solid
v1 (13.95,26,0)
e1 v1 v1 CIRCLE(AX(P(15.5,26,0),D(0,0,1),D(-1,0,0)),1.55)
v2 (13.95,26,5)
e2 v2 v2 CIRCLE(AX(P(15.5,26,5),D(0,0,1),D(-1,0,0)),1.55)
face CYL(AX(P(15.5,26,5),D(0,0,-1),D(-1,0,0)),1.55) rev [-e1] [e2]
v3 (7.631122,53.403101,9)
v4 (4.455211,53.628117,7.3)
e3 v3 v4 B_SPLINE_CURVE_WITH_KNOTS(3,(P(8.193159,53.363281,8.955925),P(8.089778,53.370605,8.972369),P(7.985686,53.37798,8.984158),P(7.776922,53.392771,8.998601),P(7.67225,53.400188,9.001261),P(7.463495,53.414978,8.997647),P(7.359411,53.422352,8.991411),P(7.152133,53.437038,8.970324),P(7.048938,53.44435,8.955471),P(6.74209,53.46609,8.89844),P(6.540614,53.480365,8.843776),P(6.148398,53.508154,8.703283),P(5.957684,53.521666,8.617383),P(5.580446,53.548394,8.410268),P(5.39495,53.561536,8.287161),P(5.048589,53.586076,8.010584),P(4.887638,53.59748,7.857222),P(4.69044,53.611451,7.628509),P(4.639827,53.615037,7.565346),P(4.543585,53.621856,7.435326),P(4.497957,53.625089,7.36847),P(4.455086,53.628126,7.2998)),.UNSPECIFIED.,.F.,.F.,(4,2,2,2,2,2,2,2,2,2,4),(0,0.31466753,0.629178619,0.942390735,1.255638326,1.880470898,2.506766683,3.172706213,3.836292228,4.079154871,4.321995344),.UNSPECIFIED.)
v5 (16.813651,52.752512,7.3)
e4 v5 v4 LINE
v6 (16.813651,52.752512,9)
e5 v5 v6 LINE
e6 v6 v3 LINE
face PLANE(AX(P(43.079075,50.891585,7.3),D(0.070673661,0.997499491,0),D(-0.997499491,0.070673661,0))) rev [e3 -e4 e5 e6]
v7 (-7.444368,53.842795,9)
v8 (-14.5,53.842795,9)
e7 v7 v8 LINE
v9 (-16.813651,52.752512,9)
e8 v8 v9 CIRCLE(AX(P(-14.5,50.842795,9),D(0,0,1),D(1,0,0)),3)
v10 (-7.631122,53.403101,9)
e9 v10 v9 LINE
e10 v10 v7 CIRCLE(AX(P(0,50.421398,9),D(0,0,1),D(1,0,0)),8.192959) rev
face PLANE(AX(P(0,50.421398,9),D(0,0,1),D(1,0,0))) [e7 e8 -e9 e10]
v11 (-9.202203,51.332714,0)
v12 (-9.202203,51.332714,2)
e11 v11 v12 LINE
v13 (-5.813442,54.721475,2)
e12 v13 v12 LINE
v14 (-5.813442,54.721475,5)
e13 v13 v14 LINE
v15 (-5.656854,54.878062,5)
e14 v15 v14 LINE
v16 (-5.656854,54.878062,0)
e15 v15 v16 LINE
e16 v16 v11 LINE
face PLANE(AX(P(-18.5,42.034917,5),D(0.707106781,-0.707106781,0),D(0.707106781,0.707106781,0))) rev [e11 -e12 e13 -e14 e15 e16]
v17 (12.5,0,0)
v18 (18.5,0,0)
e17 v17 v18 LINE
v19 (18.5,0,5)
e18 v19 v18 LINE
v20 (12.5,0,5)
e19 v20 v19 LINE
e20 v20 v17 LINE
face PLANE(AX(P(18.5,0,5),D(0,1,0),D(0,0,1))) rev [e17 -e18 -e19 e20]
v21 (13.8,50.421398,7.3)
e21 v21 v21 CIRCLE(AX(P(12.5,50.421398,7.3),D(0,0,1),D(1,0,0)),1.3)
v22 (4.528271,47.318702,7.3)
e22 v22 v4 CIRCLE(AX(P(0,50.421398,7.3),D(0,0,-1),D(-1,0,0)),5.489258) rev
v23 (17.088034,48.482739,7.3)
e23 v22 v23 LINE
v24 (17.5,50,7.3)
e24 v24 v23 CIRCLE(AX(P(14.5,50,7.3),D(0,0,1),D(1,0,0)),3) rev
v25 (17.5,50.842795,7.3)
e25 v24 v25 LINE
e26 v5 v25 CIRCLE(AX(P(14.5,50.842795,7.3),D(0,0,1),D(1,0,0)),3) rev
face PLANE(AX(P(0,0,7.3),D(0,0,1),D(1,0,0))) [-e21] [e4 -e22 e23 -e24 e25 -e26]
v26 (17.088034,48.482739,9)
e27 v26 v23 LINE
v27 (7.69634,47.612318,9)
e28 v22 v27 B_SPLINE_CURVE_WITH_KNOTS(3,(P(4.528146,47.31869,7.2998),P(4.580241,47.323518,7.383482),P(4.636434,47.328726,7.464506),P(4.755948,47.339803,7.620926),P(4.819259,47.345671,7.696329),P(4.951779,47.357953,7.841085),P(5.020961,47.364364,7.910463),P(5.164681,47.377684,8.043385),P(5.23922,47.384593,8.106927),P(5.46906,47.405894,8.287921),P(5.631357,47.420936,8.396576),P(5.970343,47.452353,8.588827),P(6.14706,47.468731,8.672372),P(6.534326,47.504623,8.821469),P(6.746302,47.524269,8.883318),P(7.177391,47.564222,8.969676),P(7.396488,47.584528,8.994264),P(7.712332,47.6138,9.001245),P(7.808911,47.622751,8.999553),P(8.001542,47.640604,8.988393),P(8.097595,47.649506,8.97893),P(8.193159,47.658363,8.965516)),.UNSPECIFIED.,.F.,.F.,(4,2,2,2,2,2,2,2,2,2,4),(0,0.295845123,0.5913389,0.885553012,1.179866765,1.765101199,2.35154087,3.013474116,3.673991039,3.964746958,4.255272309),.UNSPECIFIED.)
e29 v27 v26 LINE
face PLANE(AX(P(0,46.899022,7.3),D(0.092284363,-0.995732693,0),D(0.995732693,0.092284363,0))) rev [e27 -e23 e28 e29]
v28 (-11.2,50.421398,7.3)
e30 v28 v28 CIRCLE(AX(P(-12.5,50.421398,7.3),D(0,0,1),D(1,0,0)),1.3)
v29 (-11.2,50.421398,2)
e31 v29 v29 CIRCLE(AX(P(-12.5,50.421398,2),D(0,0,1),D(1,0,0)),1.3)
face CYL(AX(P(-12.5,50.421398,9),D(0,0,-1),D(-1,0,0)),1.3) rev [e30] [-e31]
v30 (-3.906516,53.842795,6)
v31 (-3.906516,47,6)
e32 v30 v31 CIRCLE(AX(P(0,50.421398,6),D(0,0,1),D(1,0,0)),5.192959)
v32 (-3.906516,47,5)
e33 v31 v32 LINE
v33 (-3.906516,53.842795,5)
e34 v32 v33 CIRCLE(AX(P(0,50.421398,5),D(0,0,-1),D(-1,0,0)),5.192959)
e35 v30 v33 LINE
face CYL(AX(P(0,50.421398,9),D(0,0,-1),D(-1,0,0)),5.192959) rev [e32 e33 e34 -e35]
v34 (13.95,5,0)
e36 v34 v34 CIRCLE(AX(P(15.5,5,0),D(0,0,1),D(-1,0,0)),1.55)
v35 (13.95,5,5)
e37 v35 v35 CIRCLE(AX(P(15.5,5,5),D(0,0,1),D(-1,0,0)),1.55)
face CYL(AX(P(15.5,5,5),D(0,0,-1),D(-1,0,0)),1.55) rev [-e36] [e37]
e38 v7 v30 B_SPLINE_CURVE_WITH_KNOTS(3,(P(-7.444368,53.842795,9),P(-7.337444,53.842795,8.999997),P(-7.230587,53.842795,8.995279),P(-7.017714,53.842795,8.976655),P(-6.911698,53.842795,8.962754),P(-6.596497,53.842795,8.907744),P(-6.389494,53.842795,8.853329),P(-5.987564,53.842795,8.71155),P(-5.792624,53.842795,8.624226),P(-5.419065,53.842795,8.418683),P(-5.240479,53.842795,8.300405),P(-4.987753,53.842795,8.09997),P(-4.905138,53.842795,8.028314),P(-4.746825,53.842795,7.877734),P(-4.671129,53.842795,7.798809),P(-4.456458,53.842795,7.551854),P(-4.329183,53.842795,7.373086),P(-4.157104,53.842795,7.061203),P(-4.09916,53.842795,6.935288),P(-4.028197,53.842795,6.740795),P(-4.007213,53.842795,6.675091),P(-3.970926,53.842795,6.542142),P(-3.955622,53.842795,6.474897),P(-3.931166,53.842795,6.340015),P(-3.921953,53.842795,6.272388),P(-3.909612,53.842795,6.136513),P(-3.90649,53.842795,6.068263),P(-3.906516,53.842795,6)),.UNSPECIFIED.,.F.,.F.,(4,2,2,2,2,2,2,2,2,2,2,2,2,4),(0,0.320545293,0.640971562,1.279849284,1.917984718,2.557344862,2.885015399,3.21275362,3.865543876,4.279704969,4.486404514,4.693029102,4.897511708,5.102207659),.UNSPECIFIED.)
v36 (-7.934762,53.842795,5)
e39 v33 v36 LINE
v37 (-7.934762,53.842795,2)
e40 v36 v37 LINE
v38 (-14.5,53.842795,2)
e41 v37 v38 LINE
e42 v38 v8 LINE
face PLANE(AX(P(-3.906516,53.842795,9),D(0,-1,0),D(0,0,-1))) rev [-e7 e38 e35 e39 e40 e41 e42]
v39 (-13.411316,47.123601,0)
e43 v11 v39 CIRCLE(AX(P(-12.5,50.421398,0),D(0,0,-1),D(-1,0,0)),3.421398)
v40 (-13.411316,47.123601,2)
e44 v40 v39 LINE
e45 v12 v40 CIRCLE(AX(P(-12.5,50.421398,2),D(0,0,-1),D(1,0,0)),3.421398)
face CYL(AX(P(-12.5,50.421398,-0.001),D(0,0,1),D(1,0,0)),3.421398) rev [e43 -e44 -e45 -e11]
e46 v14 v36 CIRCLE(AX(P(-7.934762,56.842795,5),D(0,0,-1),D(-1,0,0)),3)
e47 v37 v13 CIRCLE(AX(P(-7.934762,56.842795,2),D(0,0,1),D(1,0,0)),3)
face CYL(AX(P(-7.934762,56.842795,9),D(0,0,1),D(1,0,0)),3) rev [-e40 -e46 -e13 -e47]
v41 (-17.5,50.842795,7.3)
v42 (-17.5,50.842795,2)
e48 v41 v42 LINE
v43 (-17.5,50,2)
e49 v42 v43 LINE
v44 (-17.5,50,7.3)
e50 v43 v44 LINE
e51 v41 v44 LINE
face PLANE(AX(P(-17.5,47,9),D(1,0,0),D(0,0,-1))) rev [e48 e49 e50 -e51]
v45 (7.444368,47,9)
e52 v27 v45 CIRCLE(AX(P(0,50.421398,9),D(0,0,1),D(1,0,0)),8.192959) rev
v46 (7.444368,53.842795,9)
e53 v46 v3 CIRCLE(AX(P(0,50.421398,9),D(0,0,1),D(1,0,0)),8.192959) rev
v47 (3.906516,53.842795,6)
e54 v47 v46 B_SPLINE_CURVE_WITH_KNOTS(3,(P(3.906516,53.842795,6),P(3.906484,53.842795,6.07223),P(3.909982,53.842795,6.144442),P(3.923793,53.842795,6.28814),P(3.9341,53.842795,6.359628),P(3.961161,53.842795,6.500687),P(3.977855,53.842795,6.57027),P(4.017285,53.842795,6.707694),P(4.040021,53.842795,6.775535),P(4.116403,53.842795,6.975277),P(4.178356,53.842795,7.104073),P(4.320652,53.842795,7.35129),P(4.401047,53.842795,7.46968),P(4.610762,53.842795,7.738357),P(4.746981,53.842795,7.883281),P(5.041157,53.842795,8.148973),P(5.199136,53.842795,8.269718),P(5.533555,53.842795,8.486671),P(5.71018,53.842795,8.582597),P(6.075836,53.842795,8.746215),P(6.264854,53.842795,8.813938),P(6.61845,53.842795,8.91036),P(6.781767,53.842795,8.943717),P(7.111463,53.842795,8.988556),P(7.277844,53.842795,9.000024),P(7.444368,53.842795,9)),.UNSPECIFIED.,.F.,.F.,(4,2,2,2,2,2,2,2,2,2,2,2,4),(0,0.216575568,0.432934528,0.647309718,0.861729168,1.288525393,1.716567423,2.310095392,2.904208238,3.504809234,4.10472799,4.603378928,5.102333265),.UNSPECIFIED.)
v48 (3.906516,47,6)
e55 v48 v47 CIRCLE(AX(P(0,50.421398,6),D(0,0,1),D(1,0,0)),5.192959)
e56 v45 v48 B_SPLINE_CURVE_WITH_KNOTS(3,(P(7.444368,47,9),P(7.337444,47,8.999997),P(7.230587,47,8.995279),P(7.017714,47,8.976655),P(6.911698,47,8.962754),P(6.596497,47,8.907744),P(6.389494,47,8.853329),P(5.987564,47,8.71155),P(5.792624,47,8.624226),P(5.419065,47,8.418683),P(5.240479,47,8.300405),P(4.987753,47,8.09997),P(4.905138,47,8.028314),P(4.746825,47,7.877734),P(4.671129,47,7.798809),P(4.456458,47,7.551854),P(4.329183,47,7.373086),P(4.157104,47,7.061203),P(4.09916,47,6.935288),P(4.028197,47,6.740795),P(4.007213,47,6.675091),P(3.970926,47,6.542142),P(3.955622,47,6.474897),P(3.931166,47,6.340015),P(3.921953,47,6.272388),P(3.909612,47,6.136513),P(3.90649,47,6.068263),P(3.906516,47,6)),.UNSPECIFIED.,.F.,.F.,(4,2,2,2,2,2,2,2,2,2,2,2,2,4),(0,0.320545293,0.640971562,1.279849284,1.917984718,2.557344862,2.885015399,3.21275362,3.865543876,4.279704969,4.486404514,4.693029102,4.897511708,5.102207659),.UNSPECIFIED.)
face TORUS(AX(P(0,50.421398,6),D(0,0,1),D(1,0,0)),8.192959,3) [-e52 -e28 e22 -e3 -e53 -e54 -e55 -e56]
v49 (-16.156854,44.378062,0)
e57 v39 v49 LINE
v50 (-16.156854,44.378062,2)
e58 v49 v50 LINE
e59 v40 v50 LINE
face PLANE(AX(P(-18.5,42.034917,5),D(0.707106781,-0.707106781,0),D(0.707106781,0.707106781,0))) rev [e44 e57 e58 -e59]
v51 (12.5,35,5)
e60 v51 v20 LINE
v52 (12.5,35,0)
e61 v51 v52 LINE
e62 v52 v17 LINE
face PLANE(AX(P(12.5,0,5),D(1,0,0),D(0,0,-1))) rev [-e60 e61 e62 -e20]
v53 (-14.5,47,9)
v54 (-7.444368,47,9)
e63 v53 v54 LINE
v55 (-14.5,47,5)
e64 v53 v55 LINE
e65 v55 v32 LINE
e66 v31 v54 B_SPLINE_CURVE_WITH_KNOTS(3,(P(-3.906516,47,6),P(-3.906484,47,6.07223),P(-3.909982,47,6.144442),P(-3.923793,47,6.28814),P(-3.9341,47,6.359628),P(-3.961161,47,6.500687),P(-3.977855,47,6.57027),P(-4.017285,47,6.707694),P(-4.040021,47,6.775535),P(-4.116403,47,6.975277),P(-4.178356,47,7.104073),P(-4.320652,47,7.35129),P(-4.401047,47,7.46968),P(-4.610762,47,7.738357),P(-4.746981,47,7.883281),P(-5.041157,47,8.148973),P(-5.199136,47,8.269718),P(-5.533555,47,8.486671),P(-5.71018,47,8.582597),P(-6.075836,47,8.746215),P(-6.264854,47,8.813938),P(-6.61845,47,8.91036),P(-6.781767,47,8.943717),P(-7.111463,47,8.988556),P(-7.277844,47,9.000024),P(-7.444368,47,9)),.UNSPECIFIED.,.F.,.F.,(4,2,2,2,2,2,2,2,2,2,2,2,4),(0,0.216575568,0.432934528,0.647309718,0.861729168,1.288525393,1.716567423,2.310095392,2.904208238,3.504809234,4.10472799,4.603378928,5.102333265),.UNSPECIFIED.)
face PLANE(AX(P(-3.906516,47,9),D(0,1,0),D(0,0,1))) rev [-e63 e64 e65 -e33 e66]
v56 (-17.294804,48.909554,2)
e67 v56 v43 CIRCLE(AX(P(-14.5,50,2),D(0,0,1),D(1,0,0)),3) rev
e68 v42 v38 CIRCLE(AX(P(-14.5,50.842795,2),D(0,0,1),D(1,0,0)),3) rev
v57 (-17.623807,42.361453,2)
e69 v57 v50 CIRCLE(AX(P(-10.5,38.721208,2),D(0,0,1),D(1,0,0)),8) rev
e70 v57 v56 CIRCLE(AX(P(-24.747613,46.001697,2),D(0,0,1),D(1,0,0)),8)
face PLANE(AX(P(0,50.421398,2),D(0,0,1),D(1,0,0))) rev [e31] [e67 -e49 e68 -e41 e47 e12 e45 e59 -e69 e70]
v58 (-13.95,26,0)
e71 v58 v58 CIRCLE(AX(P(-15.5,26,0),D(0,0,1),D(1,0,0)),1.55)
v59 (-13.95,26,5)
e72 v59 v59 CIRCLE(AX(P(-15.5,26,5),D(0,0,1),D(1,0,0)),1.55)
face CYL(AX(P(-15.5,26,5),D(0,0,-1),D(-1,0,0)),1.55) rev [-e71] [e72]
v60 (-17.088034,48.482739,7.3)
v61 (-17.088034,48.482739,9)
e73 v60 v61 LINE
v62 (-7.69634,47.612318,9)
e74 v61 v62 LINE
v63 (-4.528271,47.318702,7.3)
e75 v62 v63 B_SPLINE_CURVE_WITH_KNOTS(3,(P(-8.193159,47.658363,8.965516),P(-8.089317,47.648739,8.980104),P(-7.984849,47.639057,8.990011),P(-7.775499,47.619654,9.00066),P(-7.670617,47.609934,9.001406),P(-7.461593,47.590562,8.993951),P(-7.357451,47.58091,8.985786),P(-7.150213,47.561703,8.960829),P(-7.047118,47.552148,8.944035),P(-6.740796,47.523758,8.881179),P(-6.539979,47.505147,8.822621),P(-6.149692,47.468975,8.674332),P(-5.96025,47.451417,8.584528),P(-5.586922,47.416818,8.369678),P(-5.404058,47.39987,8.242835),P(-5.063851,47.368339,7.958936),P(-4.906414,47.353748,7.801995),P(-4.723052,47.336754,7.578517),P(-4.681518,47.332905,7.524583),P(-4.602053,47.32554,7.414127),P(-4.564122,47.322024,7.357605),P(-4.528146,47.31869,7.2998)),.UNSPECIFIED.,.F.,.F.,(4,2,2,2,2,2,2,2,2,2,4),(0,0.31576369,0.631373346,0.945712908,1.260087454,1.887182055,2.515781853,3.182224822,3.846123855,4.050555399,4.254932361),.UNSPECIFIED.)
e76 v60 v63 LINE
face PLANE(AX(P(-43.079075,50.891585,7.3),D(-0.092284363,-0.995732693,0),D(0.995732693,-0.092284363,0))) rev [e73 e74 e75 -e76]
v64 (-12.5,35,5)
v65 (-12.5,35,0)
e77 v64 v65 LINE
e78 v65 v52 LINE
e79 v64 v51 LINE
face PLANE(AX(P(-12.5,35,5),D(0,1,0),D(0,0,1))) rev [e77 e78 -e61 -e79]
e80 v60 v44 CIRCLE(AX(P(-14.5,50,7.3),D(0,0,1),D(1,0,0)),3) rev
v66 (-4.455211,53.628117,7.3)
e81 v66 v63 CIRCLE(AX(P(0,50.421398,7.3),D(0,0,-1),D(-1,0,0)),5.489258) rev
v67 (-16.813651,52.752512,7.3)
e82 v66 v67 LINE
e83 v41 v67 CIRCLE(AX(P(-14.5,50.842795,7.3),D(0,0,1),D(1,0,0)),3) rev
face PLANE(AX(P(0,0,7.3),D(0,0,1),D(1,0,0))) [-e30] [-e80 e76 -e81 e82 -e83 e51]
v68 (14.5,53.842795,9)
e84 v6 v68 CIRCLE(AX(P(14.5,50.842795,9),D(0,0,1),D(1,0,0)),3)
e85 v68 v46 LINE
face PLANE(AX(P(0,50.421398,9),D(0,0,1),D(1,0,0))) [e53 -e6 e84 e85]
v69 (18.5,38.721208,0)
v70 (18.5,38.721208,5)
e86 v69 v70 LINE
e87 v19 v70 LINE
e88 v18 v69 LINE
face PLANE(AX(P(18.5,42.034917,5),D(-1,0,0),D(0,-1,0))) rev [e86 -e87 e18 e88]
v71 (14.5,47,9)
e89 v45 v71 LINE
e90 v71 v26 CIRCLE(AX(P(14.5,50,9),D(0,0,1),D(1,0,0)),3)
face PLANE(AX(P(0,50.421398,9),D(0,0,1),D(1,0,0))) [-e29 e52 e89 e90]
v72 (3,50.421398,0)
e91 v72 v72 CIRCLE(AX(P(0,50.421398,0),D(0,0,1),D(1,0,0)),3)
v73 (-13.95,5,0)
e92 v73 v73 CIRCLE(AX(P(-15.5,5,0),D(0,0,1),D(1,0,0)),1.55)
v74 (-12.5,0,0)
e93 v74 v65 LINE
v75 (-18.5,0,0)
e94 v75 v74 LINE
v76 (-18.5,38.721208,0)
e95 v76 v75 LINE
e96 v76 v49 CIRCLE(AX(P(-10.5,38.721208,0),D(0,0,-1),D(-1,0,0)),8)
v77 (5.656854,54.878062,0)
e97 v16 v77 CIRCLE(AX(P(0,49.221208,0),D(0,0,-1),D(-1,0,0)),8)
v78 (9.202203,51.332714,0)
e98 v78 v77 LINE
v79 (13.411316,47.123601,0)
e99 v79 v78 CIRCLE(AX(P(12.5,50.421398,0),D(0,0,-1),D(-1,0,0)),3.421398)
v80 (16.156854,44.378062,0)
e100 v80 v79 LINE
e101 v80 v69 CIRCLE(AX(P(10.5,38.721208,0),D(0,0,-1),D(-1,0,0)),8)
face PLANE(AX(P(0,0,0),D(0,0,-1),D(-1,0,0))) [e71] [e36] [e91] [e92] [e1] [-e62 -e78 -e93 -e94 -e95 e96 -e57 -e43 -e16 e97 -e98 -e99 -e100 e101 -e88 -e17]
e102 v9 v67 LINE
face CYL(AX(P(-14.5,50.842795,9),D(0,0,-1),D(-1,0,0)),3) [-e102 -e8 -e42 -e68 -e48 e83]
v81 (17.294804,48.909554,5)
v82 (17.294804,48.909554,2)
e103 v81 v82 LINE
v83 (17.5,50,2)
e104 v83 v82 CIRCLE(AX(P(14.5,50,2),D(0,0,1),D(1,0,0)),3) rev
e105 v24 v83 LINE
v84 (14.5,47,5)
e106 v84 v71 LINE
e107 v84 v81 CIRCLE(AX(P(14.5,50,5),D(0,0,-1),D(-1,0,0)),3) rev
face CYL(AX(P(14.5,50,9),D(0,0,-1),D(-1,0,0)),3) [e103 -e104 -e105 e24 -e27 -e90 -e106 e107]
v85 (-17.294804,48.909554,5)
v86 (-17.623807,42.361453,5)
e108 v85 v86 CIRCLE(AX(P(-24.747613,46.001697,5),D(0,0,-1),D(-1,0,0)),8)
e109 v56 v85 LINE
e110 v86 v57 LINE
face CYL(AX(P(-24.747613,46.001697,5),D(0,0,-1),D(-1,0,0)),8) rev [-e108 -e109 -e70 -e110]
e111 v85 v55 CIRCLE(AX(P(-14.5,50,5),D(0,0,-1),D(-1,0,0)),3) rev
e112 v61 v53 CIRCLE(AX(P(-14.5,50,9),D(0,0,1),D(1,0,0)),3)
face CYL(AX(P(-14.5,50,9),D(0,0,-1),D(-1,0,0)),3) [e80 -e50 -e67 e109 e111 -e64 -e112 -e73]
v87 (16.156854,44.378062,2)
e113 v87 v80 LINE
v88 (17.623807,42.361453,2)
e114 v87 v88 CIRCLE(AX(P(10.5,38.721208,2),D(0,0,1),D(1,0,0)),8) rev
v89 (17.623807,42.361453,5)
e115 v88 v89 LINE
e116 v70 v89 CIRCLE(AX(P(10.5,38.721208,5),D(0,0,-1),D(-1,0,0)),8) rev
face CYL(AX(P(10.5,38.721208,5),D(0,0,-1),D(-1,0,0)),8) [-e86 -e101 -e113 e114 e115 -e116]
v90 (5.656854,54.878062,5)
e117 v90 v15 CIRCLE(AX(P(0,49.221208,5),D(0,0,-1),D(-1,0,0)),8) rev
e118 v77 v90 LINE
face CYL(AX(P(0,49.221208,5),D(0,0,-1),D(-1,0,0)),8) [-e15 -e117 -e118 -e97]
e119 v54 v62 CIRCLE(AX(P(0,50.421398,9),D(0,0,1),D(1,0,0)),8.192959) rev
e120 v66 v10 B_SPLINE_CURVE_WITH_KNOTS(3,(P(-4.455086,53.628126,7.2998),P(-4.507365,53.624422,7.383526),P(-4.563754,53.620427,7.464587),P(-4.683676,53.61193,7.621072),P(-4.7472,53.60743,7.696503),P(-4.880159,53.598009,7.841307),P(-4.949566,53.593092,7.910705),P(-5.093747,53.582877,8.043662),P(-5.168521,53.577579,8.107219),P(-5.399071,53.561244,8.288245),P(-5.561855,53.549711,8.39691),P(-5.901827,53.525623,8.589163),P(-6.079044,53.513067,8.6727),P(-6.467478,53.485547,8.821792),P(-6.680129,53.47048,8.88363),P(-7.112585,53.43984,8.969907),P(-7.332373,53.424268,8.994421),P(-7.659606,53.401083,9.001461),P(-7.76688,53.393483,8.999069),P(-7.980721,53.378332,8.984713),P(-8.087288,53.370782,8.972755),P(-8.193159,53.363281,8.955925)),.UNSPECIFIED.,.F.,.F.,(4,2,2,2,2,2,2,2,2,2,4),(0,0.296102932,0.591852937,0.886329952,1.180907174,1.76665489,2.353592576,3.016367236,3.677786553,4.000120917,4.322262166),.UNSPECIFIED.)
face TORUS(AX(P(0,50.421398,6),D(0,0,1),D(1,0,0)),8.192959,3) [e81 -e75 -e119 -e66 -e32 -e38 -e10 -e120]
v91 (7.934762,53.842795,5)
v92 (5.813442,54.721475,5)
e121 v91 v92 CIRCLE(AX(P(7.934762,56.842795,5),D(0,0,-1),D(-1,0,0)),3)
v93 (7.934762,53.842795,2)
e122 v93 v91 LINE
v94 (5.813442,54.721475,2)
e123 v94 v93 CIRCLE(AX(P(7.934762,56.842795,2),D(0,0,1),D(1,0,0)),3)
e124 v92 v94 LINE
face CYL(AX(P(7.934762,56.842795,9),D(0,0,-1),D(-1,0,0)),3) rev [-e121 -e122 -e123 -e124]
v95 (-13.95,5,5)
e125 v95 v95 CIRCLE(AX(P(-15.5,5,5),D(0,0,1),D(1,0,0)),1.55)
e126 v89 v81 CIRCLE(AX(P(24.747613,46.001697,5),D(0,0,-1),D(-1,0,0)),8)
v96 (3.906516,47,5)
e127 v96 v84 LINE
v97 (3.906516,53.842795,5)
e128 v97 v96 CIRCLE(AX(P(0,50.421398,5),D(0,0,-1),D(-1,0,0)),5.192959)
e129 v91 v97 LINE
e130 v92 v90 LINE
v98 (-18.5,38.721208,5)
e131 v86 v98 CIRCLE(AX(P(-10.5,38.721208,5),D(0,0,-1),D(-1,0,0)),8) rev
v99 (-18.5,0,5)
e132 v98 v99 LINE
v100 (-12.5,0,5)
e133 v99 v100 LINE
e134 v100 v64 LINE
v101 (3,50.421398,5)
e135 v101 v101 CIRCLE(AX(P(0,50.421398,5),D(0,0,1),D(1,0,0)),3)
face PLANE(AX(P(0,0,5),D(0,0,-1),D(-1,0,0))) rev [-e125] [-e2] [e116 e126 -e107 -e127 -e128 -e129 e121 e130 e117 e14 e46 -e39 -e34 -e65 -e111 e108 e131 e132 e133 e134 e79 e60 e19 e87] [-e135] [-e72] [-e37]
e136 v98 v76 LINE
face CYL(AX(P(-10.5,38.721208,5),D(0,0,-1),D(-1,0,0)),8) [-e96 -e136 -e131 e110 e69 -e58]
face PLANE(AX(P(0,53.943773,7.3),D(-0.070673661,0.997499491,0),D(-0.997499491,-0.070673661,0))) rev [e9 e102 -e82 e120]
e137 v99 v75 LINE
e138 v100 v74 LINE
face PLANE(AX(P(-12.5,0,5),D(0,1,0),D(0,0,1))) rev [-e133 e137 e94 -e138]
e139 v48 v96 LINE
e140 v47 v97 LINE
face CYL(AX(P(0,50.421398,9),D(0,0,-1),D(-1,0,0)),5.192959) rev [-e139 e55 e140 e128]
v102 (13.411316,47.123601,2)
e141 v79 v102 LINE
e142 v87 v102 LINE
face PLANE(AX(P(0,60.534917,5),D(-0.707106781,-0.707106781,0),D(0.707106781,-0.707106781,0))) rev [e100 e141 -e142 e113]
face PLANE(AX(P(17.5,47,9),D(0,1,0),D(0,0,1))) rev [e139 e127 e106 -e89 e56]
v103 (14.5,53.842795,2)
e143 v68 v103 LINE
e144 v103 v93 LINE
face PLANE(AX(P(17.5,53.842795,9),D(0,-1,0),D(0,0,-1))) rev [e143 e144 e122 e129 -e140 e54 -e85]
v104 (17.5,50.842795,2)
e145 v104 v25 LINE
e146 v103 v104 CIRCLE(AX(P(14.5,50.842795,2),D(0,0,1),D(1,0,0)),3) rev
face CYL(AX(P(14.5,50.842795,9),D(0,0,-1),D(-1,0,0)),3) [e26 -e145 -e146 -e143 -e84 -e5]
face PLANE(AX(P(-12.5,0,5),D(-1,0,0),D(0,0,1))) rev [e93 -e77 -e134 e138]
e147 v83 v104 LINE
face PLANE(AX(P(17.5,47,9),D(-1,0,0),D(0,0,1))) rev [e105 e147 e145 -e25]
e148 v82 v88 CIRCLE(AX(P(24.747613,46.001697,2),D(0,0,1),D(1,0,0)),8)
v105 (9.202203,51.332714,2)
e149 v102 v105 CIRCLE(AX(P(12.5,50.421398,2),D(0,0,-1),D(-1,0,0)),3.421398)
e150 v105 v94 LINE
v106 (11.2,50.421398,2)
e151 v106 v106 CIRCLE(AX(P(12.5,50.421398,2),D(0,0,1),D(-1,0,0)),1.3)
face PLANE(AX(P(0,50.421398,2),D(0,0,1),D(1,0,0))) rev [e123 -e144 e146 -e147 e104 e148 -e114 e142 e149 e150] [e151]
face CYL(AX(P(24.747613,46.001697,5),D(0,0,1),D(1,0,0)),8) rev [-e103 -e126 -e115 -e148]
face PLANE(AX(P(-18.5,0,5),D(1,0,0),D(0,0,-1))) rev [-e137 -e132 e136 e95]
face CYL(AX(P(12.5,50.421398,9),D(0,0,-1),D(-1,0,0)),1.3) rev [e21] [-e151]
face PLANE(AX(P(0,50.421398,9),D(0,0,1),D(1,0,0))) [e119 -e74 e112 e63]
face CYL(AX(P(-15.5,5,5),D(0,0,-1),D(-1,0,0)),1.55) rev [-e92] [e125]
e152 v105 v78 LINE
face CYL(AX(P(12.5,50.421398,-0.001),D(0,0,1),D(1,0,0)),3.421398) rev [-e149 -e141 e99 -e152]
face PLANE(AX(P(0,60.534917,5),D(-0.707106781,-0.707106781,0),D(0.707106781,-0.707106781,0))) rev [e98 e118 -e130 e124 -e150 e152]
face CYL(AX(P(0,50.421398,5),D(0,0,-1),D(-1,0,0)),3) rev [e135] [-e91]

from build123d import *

# Parameters (mm, degrees)
SKETCH_1_R           = 3
SKETCH_1_R_2         = 1.55
EXTRUDE_1_DEPTH      = 5
EXTRUDE_2_DEPTH      = 4
EXTRUDE_2_DEPTH_BACK = 3
SKETCH_2_R           = 1.3
FILLET_1_R           = 8
FILLET_2_R           = 3
CUT_EXTRUDE_1_REACH  = 62.544
SKETCH_3_R           = 3.421397557
CUT_EXTRUDE_2_DEPTH  = 1.7
FILLET_START         = 2
FILLET_3_DEPTH       = 3


with BuildPart() as part:
    # 草图1 → 凸台-拉伸1 (new body)
    with BuildSketch(Plane.XY):
        Polygon((-12.5, 0), (-18.5, 0), (-18.5, 42.034916596), (0, 60.534916596), (18.5, 42.034916596), (18.5, 0), (12.5, 0), (12.5, 35), (-12.5, 35), align=None)
        with Locations((0, 50.421397557)):
            Circle(SKETCH_1_R, mode=Mode.SUBTRACT)
        with Locations((-15.5, 5)):
            Circle(SKETCH_1_R_2, mode=Mode.SUBTRACT)
        with Locations((-15.5, 26)):
            Circle(SKETCH_1_R_2, mode=Mode.SUBTRACT)
        with Locations(Location((15.5, 5, 0), (0, 0, 180))):
            Circle(SKETCH_1_R_2, mode=Mode.SUBTRACT)
        with Locations(Location((15.5, 26, 0), (0, 0, 180))):
            Circle(SKETCH_1_R_2, mode=Mode.SUBTRACT)
    extrude(amount=EXTRUDE_1_DEPTH)

    # 草图2 → 凸台-拉伸2 (add, two sides: drawn at the far end of the back side and taken through both)
    # profile 1 of 2: a face of its own
    with BuildSketch(Plane.XY.offset(5).offset(-EXTRUDE_2_DEPTH_BACK)):
        with BuildLine():
            Line((17.5, 47), (3.906515802, 47))
            ThreePointArc((3.906515802, 47), (5.192959363, 50.421397557), (3.906515802, 53.842795113))
            Line((3.906515802, 53.842795113), (17.5, 53.842795113))
            Line((17.5, 53.842795113), (17.5, 47))
        make_face()
        with Locations(Location((12.5, 50.421397557, 0), (0, 0, 180))):
            Circle(SKETCH_2_R, mode=Mode.SUBTRACT)
    # profile 2 of 2: a face of its own
    with BuildSketch(Plane.XY.offset(5).offset(-EXTRUDE_2_DEPTH_BACK)):
        with BuildLine():
            Line((-17.5, 47), (-17.5, 53.842795113))
            Line((-17.5, 53.842795113), (-3.906515802, 53.842795113))
            ThreePointArc((-3.906515802, 53.842795113), (-5.192959363, 50.421397557), (-3.906515802, 47))
            Line((-3.906515802, 47), (-17.5, 47))
        make_face()
        with Locations((-12.5, 50.421397557)):
            Circle(SKETCH_2_R, mode=Mode.SUBTRACT)
    extrude(amount=EXTRUDE_2_DEPTH + EXTRUDE_2_DEPTH_BACK)

    # 圆角1
    fillet_1_edges = [part.edges().sort_by_distance(p)[0] for p in [
        (-18.5, 42.034916596, 2.5),
        (0, 60.534916596, 2.5),
        (18.5, 42.034916596, 2.5),
    ]]
    fillet(fillet_1_edges, radius=FILLET_1_R)

    # 圆角2
    fillet_2_edges = [part.edges().sort_by_distance(p)[0] for p in [
        (-6.692121483, 53.842795113, 3.5),
        (-17.5, 47, 5.5),
        (-5.192959363, 50.421397557, 9),
        (-17.5, 53.842795113, 5.5),
        (6.692121483, 53.842795113, 3.5),
        (17.5, 53.842795113, 5.5),
        (5.192959363, 50.421397557, 9),
        (17.5, 47, 5.5),
    ]]
    fillet(fillet_2_edges, radius=FILLET_2_R)

    # 草图3 → 切除-拉伸1 (cut, up to next)
    with BuildSketch(Plane(origin=(0, 0, 2), x_dir=(-1, 0, 0), z_dir=(0, 0, -1)), mode=Mode.PRIVATE) as cut_extrude_1_sk1:
        with Locations((-12.5, 50.421397557)):
            Circle(SKETCH_3_R)
    cut_extrude_1_tool1 = extrude(cut_extrude_1_sk1.sketch, amount=CUT_EXTRUDE_1_REACH, mode=Mode.PRIVATE) & part.part
    # 草图3 → 切除-拉伸1 (cut, up to next)
    with BuildSketch(Plane(origin=(0, 0, 2), x_dir=(-1, 0, 0), z_dir=(0, 0, -1)), mode=Mode.PRIVATE) as cut_extrude_1_sk2:
        with Locations((12.5, 50.421397557)):
            Circle(SKETCH_3_R)
    cut_extrude_1_tool2 = extrude(cut_extrude_1_sk2.sketch, amount=CUT_EXTRUDE_1_REACH, mode=Mode.PRIVATE) & part.part
    add(cut_extrude_1_tool1.solids().sort_by_distance((12.5, 50.421398, 2))[0], mode=Mode.SUBTRACT)
    add(cut_extrude_1_tool2.solids().sort_by_distance((-12.5, 50.421398, 2))[0], mode=Mode.SUBTRACT)

    # 草图4 → 切除-拉伸2 (cut)
    with BuildSketch(Plane.XY.offset(9)):
        Polygon((0, 46.899022366), (43.079074711, 50.891584803), (0, 53.943772747), (-43.079074711, 50.891584803), align=None)
    extrude(amount=-CUT_EXTRUDE_2_DEPTH, mode=Mode.SUBTRACT)

    # 圆角3: read off the stored shape, not the designer's step
    # 圆角3 outline → 圆角3 (add)
    with BuildSketch(Plane.XY.offset(FILLET_START)):
        with BuildLine():
            ThreePointArc((17.623806552, 42.361452624), (16.757691875, 45.600251323), (17.294803574, 48.909553768))
            ThreePointArc((17.294803574, 48.909553768), (16.192433353, 47.52297167), (14.5, 47))
            Line((14.5, 47), (13.534916596, 47))
            Line((13.534916596, 47), (16.156854249, 44.378062347))
            ThreePointArc((16.156854249, 44.378062347), (16.969389563, 43.42726788), (17.623806552, 42.361452624))
        make_face()
        with BuildLine():
            ThreePointArc((-14.5, 47), (-16.192433353, 47.52297167), (-17.294803574, 48.909553768))
            ThreePointArc((-17.294803574, 48.909553768), (-16.757691875, 45.600251323), (-17.623806552, 42.361452624))
            ThreePointArc((-17.623806552, 42.361452624), (-16.969389563, 43.42726788), (-16.156854249, 44.378062347))
            Line((-16.156854249, 44.378062347), (-13.534916596, 47))
            Line((-13.534916596, 47), (-14.5, 47))
        make_face()
    extrude(amount=FILLET_3_DEPTH)


solid = part.part
